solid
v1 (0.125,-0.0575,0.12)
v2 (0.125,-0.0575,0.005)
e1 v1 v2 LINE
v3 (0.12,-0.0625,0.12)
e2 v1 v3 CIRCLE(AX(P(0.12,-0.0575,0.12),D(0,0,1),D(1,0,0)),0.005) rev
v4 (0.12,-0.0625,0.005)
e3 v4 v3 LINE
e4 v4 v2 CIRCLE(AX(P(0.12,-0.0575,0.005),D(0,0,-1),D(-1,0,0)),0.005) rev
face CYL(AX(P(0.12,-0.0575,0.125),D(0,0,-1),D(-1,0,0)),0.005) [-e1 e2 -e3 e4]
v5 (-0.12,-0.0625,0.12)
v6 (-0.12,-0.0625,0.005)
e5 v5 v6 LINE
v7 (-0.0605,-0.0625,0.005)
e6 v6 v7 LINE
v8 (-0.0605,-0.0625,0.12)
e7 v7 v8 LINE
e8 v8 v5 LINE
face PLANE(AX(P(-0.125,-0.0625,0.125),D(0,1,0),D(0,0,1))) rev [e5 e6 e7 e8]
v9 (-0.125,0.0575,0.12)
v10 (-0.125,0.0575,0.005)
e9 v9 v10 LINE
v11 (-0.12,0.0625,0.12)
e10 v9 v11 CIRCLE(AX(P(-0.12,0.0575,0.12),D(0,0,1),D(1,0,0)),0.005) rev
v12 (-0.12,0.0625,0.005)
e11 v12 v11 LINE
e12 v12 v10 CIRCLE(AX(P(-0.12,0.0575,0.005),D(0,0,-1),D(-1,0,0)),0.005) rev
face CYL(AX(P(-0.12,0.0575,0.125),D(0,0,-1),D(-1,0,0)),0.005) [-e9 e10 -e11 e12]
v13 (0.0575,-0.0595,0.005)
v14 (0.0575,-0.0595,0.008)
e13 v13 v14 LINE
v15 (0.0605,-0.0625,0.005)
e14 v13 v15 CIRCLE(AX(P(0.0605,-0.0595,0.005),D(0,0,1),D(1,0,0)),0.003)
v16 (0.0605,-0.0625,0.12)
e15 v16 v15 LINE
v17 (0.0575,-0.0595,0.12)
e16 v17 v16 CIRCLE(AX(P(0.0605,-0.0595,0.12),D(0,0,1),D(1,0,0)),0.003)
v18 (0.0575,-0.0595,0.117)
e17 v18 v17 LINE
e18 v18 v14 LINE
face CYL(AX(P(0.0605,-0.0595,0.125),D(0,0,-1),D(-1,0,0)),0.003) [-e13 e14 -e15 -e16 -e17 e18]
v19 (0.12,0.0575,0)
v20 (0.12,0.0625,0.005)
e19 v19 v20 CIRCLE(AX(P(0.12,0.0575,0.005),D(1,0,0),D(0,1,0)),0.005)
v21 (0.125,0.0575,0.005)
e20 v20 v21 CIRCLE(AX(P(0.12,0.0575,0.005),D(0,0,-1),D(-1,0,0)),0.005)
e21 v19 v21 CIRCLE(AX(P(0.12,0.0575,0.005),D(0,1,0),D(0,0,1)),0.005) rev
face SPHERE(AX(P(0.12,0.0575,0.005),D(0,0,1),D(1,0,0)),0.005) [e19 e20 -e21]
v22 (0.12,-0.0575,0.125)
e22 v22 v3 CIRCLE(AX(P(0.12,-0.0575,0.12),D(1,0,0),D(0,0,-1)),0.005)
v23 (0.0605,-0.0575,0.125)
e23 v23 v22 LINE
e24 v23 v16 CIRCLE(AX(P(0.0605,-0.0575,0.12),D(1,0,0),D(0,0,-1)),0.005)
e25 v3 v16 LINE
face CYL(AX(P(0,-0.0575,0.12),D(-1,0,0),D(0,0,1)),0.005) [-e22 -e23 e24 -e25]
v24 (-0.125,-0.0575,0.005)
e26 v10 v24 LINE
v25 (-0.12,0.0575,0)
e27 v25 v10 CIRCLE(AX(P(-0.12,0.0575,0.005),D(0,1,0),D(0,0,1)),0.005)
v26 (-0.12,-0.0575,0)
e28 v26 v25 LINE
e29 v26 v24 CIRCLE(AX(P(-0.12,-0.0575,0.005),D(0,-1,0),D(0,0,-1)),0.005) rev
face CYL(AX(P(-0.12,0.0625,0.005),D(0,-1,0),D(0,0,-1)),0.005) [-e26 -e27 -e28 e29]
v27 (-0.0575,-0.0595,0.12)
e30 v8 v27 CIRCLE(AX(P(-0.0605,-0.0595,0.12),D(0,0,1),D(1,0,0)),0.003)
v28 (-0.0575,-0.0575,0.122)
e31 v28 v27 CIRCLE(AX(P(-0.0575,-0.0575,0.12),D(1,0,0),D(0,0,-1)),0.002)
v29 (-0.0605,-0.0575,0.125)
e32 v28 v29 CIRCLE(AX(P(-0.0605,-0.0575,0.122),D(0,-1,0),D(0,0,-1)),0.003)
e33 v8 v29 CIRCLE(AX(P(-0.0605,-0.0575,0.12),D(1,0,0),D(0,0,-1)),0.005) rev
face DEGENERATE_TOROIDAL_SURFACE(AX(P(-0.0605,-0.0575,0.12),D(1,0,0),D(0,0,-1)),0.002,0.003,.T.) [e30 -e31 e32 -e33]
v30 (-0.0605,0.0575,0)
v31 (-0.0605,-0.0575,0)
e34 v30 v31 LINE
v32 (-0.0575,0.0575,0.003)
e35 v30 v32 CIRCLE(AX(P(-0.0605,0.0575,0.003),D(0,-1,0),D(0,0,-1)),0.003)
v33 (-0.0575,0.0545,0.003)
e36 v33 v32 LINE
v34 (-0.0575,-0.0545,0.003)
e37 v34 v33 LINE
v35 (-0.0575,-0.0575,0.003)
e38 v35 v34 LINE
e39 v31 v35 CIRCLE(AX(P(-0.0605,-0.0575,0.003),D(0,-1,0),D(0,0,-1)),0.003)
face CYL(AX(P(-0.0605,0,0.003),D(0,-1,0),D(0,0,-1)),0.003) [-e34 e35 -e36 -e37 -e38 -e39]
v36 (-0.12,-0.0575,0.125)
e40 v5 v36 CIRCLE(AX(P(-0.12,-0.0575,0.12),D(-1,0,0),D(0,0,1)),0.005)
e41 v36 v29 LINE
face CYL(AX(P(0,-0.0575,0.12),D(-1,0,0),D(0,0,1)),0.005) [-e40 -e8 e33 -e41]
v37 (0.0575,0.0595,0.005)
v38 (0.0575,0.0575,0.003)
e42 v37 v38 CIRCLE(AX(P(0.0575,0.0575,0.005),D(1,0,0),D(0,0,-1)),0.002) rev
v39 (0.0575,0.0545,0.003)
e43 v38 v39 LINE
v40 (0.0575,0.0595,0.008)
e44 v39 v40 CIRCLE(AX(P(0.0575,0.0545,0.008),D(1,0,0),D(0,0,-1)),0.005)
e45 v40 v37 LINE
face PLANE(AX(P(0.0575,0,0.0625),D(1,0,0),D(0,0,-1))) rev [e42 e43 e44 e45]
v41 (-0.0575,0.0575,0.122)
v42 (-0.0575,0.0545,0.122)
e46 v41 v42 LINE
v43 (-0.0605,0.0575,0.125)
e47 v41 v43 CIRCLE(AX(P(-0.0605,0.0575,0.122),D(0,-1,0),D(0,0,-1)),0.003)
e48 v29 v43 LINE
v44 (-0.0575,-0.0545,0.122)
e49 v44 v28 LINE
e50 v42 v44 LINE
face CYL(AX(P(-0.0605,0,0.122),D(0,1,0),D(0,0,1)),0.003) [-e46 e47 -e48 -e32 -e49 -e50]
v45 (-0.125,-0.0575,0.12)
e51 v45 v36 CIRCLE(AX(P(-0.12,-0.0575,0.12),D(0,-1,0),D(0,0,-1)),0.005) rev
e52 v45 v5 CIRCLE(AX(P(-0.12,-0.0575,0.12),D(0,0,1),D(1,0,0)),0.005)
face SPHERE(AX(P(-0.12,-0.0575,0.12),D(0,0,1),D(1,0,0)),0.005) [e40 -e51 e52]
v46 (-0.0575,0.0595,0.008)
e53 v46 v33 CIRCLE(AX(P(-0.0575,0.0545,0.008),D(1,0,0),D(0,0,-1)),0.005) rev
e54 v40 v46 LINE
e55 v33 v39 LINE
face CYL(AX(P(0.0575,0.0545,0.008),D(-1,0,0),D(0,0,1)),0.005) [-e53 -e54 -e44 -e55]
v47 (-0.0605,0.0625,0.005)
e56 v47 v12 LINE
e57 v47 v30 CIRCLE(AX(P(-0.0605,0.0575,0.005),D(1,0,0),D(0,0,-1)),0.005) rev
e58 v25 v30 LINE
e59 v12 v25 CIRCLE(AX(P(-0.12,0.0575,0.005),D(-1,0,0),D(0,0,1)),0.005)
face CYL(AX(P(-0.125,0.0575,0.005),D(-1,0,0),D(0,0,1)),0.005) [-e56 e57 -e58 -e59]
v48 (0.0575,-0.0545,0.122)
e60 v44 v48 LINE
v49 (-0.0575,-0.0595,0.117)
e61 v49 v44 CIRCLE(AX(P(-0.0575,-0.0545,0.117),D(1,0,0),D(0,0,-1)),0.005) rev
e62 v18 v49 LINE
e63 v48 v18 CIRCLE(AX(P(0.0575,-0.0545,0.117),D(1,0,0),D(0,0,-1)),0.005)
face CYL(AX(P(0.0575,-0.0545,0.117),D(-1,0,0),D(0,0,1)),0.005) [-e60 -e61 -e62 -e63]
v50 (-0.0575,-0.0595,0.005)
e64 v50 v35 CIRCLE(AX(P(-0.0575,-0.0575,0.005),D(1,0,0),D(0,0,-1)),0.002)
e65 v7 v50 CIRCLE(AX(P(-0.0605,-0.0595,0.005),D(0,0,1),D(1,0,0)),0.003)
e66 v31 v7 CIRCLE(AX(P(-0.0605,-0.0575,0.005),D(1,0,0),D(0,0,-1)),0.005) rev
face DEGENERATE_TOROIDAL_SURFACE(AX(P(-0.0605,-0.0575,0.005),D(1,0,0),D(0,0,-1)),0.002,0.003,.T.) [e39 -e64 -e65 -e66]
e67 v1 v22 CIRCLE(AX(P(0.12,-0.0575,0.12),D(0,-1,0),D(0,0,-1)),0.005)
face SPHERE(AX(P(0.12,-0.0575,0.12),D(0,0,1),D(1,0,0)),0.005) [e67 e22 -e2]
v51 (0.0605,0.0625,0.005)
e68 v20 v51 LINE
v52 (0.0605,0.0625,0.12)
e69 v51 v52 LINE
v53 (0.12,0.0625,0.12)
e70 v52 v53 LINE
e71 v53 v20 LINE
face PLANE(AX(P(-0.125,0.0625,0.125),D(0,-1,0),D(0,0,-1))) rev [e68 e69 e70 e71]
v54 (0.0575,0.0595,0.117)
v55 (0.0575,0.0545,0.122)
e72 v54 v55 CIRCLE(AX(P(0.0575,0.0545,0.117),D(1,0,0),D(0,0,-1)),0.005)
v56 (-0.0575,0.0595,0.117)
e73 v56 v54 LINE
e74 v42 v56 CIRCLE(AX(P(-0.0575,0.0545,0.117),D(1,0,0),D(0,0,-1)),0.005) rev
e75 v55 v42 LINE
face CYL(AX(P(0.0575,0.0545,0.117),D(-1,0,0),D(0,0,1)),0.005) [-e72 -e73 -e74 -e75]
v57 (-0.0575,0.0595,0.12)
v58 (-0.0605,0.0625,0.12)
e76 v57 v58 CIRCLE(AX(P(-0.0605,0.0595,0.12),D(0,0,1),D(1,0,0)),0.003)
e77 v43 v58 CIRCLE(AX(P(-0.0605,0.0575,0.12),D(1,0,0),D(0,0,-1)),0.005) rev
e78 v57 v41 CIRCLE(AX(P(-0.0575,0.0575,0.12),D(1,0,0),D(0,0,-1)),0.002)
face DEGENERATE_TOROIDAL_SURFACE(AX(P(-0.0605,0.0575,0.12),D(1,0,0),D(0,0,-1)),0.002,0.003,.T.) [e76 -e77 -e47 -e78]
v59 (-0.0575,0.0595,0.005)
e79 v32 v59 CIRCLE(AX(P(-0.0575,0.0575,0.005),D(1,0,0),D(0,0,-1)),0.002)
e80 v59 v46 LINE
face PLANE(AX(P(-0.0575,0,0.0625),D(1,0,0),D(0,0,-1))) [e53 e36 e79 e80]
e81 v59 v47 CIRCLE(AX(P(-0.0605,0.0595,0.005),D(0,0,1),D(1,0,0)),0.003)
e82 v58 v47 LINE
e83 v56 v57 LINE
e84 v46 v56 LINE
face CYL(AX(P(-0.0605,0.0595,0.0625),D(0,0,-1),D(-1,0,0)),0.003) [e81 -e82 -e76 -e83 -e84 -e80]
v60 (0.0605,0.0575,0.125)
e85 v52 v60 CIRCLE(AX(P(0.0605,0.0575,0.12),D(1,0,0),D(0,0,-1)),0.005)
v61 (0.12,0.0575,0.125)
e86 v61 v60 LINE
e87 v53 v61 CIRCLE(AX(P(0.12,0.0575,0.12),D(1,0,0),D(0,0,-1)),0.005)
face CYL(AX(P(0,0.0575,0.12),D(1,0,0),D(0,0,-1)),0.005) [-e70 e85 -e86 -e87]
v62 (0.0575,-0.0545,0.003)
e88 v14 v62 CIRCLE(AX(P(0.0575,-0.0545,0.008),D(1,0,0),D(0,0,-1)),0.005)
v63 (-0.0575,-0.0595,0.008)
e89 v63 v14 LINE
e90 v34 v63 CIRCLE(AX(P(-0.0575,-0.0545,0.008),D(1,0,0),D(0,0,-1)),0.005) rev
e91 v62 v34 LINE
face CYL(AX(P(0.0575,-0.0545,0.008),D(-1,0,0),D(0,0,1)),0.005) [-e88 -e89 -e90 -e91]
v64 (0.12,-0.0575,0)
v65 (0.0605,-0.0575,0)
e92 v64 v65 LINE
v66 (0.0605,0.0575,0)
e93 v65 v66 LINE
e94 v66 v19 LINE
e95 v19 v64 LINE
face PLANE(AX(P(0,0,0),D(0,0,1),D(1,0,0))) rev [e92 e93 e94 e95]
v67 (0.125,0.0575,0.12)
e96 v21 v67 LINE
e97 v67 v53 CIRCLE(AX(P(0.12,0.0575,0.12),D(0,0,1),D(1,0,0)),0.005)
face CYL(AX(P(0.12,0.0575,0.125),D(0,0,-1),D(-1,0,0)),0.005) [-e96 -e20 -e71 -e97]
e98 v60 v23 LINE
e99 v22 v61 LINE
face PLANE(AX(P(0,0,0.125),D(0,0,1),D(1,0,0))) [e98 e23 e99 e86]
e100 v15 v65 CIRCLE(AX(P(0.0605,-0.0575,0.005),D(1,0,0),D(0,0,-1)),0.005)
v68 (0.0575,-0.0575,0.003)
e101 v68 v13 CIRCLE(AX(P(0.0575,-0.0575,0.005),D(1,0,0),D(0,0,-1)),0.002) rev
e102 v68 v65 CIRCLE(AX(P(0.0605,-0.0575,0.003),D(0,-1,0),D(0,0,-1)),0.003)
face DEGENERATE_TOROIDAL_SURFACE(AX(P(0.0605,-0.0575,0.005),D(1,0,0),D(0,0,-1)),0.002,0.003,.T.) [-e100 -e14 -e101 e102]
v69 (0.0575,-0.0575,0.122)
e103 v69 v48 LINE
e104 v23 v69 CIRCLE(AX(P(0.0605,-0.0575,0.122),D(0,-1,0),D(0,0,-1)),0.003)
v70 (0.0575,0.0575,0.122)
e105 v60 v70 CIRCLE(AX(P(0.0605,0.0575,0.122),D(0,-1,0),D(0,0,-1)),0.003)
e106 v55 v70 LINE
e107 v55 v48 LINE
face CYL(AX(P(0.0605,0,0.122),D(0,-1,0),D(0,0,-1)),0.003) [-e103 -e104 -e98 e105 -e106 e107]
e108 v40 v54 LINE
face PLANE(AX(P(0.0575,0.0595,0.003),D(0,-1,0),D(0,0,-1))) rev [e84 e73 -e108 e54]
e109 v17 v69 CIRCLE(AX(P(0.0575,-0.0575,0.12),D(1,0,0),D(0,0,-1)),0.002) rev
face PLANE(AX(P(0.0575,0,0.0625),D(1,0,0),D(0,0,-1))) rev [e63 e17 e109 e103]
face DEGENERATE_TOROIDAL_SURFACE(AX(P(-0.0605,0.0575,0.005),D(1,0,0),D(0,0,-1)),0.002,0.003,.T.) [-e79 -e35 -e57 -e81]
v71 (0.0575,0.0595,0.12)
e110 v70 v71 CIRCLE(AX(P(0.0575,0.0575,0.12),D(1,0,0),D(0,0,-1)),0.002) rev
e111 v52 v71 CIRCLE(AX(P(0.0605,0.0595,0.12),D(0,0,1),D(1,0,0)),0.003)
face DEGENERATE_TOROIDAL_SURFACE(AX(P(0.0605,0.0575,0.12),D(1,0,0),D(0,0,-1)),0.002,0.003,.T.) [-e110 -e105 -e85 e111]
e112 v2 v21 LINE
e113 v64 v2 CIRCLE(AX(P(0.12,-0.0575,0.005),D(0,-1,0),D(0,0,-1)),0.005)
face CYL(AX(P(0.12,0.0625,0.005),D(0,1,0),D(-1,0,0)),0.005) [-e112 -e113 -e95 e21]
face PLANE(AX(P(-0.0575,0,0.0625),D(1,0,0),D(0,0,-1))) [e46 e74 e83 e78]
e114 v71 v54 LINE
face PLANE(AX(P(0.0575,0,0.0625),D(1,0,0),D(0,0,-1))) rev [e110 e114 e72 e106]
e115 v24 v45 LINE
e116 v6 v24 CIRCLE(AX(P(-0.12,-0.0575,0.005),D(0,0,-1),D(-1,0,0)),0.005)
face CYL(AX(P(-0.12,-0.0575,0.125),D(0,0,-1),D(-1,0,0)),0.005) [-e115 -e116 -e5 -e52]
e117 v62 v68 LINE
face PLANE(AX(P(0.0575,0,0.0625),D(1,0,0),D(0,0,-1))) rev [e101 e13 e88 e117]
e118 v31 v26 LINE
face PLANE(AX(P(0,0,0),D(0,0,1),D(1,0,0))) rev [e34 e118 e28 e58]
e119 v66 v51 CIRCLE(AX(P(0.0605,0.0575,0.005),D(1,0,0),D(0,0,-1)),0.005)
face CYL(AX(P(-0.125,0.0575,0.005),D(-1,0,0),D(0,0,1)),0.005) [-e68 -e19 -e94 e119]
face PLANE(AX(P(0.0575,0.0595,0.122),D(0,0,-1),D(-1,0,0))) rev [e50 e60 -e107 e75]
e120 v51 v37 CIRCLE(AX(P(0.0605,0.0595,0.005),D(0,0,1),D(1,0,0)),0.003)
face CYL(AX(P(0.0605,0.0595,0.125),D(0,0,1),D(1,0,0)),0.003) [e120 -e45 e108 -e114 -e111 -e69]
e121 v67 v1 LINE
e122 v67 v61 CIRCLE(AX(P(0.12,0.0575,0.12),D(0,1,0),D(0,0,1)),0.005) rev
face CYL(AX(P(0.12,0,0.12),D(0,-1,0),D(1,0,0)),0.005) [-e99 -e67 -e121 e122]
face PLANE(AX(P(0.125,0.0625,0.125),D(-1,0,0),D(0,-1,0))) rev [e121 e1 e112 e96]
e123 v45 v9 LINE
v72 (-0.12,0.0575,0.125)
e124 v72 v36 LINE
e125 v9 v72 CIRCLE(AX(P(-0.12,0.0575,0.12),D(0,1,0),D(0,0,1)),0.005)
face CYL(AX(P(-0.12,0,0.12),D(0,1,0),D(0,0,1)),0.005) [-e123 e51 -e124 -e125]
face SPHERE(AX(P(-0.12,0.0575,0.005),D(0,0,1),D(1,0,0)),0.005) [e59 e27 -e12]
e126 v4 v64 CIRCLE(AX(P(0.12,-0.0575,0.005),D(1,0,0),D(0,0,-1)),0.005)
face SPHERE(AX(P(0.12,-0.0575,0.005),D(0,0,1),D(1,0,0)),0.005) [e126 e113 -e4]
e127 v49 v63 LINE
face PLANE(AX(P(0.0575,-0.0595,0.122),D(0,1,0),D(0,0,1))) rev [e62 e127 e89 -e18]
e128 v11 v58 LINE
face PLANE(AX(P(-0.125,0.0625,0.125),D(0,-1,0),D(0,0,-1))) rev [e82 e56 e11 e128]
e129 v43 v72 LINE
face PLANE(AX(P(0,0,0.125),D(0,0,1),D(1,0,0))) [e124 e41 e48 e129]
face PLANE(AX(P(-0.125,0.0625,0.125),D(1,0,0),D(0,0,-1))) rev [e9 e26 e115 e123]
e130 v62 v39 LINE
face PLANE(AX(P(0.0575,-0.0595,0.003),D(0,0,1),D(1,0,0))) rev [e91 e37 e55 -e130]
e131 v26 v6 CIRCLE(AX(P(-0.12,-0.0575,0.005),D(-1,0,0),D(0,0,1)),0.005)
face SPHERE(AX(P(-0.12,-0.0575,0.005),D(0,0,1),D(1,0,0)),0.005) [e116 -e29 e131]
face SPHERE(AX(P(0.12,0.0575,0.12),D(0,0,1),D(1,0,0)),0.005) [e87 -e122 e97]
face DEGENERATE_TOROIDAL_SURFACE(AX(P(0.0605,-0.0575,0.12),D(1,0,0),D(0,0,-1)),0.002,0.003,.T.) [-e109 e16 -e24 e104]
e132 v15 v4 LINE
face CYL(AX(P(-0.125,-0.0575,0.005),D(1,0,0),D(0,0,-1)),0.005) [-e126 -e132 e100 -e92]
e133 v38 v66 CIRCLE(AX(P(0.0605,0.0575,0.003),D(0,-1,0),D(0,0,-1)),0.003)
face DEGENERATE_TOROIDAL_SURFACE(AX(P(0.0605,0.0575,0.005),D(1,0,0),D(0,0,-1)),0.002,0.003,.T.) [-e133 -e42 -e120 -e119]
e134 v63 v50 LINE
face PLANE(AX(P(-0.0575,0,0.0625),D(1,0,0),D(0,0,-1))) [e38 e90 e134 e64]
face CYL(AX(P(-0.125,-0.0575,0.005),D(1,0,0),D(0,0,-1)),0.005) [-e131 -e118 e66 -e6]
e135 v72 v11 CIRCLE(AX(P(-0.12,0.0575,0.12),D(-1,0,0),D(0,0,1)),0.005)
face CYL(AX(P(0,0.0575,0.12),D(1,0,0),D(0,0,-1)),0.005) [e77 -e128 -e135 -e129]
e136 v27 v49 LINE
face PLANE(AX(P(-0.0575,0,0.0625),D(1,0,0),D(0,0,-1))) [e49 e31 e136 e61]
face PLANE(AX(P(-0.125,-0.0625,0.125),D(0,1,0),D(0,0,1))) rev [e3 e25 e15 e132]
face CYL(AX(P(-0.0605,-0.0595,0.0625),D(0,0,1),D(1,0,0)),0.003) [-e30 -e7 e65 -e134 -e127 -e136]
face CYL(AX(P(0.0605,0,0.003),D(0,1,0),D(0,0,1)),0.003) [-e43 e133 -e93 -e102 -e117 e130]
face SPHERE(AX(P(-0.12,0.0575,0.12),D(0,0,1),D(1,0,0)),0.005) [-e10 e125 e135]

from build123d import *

# Parameters (mm, degrees)
SKETCH1_W                           = 0.25
SKETCH1_H                           = 0.125
ALL_BODY_DEPTH                      = 0.125
CUT_OUT_THE_BODY_FOR_PIN_DEPTH      = 0.0575
CUT_OUT_THE_BODY_FOR_PIN_DEPTH_BACK = 0.0575
SKETCH2_OUTSIDE_W                   = 2.187
SKETCH2_OUTSIDE_H                   = 2.186
SKETCH2_OUTSIDE_W_2                 = 0.119
SKETCH2_OUTSIDE_H_2                 = 0.119
BODY_FILLET_R                       = 0.005
PIN_FILLET_A_R                      = 0.005
PIN_FILLET_B_R                      = 0.003


with BuildPart() as part:
    # Sketch1 → All body (new body)
    with BuildSketch(Plane.XY):
        Rectangle(SKETCH1_W, SKETCH1_H)
    extrude(amount=ALL_BODY_DEPTH)

    # Sketch2 outside → Cut out the body for pin (cut, two sides: drawn at the far end of the back side and taken through both)
    with BuildSketch(Plane(origin=(0, 0, 0), x_dir=(0, 0, -1), z_dir=(1, 0, 0)).offset(-CUT_OUT_THE_BODY_FOR_PIN_DEPTH_BACK)):
        with Locations((-0.0625, 0)):
            Rectangle(SKETCH2_OUTSIDE_W, SKETCH2_OUTSIDE_H)
        with Locations((-0.0625, 0)):
            Rectangle(SKETCH2_OUTSIDE_W_2, SKETCH2_OUTSIDE_H_2, mode=Mode.SUBTRACT)
    extrude(amount=CUT_OUT_THE_BODY_FOR_PIN_DEPTH + CUT_OUT_THE_BODY_FOR_PIN_DEPTH_BACK, mode=Mode.SUBTRACT)

    # Body fillet
    body_fillet_edges = [part.edges().sort_by_distance(p)[0] for p in [
        (0, 0.0595, 0.003),
        (0, 0.0595, 0.122),
        (0, -0.0595, 0.122),
        (0, -0.0595, 0.003),
    ]]
    fillet(body_fillet_edges, radius=BODY_FILLET_R)

    # Pin fillet a
    pin_fillet_a_edges = [part.edges().sort_by_distance(p)[0] for p in [
        (0.125, 0, 0.125),
        (-0.09125, 0.0625, 0),
        (0.09125, -0.0625, 0),
        (0.09125, -0.0625, 0.125),
        (-0.09125, 0.0625, 0.125),
        (0.09125, 0.0625, 0.125),
        (-0.125, 0, 0.125),
        (0.09125, 0.0625, 0),
        (0.125, 0, 0),
        (-0.09125, -0.0625, 0),
        (-0.125, 0, 0),
        (-0.125, 0.0625, 0.0625),
        (0.125, 0.0625, 0.0625),
        (0.125, -0.0625, 0.0625),
        (-0.125, -0.0625, 0.0625),
        (-0.09125, -0.0625, 0.125),
    ]]
    fillet(pin_fillet_a_edges, radius=PIN_FILLET_A_R)

    # Pin fillet b
    pin_fillet_b_edges = [part.edges().sort_by_distance(p)[0] for p in [
        (0.0575, -0.0625, 0.0625),
        (0.0575, 0, 0.125),
        (0.0575, 0.0625, 0.0625),
        (0.0575, 0, 0),
        (-0.0575, 0.0625, 0.0625),
        (-0.0575, 0, 0.125),
        (-0.0575, -0.0625, 0.0625),
        (-0.0575, 0, 0),
        (0.0575, 0.061035534, 0.001464466),
        (0.0575, -0.061035534, 0.001464466),
        (0.0575, -0.061035534, 0.123535534),
        (0.0575, 0.061035534, 0.123535534),
        (-0.0575, -0.061035534, 0.123535534),
        (-0.0575, 0.061035534, 0.123535534),
        (-0.0575, -0.061035534, 0.001464466),
        (-0.0575, 0.061035534, 0.001464466),
    ]]
    fillet(pin_fillet_b_edges, radius=PIN_FILLET_B_R - 0.0001)  # a hair under: the kernel refuses the full size


solid = part.part
